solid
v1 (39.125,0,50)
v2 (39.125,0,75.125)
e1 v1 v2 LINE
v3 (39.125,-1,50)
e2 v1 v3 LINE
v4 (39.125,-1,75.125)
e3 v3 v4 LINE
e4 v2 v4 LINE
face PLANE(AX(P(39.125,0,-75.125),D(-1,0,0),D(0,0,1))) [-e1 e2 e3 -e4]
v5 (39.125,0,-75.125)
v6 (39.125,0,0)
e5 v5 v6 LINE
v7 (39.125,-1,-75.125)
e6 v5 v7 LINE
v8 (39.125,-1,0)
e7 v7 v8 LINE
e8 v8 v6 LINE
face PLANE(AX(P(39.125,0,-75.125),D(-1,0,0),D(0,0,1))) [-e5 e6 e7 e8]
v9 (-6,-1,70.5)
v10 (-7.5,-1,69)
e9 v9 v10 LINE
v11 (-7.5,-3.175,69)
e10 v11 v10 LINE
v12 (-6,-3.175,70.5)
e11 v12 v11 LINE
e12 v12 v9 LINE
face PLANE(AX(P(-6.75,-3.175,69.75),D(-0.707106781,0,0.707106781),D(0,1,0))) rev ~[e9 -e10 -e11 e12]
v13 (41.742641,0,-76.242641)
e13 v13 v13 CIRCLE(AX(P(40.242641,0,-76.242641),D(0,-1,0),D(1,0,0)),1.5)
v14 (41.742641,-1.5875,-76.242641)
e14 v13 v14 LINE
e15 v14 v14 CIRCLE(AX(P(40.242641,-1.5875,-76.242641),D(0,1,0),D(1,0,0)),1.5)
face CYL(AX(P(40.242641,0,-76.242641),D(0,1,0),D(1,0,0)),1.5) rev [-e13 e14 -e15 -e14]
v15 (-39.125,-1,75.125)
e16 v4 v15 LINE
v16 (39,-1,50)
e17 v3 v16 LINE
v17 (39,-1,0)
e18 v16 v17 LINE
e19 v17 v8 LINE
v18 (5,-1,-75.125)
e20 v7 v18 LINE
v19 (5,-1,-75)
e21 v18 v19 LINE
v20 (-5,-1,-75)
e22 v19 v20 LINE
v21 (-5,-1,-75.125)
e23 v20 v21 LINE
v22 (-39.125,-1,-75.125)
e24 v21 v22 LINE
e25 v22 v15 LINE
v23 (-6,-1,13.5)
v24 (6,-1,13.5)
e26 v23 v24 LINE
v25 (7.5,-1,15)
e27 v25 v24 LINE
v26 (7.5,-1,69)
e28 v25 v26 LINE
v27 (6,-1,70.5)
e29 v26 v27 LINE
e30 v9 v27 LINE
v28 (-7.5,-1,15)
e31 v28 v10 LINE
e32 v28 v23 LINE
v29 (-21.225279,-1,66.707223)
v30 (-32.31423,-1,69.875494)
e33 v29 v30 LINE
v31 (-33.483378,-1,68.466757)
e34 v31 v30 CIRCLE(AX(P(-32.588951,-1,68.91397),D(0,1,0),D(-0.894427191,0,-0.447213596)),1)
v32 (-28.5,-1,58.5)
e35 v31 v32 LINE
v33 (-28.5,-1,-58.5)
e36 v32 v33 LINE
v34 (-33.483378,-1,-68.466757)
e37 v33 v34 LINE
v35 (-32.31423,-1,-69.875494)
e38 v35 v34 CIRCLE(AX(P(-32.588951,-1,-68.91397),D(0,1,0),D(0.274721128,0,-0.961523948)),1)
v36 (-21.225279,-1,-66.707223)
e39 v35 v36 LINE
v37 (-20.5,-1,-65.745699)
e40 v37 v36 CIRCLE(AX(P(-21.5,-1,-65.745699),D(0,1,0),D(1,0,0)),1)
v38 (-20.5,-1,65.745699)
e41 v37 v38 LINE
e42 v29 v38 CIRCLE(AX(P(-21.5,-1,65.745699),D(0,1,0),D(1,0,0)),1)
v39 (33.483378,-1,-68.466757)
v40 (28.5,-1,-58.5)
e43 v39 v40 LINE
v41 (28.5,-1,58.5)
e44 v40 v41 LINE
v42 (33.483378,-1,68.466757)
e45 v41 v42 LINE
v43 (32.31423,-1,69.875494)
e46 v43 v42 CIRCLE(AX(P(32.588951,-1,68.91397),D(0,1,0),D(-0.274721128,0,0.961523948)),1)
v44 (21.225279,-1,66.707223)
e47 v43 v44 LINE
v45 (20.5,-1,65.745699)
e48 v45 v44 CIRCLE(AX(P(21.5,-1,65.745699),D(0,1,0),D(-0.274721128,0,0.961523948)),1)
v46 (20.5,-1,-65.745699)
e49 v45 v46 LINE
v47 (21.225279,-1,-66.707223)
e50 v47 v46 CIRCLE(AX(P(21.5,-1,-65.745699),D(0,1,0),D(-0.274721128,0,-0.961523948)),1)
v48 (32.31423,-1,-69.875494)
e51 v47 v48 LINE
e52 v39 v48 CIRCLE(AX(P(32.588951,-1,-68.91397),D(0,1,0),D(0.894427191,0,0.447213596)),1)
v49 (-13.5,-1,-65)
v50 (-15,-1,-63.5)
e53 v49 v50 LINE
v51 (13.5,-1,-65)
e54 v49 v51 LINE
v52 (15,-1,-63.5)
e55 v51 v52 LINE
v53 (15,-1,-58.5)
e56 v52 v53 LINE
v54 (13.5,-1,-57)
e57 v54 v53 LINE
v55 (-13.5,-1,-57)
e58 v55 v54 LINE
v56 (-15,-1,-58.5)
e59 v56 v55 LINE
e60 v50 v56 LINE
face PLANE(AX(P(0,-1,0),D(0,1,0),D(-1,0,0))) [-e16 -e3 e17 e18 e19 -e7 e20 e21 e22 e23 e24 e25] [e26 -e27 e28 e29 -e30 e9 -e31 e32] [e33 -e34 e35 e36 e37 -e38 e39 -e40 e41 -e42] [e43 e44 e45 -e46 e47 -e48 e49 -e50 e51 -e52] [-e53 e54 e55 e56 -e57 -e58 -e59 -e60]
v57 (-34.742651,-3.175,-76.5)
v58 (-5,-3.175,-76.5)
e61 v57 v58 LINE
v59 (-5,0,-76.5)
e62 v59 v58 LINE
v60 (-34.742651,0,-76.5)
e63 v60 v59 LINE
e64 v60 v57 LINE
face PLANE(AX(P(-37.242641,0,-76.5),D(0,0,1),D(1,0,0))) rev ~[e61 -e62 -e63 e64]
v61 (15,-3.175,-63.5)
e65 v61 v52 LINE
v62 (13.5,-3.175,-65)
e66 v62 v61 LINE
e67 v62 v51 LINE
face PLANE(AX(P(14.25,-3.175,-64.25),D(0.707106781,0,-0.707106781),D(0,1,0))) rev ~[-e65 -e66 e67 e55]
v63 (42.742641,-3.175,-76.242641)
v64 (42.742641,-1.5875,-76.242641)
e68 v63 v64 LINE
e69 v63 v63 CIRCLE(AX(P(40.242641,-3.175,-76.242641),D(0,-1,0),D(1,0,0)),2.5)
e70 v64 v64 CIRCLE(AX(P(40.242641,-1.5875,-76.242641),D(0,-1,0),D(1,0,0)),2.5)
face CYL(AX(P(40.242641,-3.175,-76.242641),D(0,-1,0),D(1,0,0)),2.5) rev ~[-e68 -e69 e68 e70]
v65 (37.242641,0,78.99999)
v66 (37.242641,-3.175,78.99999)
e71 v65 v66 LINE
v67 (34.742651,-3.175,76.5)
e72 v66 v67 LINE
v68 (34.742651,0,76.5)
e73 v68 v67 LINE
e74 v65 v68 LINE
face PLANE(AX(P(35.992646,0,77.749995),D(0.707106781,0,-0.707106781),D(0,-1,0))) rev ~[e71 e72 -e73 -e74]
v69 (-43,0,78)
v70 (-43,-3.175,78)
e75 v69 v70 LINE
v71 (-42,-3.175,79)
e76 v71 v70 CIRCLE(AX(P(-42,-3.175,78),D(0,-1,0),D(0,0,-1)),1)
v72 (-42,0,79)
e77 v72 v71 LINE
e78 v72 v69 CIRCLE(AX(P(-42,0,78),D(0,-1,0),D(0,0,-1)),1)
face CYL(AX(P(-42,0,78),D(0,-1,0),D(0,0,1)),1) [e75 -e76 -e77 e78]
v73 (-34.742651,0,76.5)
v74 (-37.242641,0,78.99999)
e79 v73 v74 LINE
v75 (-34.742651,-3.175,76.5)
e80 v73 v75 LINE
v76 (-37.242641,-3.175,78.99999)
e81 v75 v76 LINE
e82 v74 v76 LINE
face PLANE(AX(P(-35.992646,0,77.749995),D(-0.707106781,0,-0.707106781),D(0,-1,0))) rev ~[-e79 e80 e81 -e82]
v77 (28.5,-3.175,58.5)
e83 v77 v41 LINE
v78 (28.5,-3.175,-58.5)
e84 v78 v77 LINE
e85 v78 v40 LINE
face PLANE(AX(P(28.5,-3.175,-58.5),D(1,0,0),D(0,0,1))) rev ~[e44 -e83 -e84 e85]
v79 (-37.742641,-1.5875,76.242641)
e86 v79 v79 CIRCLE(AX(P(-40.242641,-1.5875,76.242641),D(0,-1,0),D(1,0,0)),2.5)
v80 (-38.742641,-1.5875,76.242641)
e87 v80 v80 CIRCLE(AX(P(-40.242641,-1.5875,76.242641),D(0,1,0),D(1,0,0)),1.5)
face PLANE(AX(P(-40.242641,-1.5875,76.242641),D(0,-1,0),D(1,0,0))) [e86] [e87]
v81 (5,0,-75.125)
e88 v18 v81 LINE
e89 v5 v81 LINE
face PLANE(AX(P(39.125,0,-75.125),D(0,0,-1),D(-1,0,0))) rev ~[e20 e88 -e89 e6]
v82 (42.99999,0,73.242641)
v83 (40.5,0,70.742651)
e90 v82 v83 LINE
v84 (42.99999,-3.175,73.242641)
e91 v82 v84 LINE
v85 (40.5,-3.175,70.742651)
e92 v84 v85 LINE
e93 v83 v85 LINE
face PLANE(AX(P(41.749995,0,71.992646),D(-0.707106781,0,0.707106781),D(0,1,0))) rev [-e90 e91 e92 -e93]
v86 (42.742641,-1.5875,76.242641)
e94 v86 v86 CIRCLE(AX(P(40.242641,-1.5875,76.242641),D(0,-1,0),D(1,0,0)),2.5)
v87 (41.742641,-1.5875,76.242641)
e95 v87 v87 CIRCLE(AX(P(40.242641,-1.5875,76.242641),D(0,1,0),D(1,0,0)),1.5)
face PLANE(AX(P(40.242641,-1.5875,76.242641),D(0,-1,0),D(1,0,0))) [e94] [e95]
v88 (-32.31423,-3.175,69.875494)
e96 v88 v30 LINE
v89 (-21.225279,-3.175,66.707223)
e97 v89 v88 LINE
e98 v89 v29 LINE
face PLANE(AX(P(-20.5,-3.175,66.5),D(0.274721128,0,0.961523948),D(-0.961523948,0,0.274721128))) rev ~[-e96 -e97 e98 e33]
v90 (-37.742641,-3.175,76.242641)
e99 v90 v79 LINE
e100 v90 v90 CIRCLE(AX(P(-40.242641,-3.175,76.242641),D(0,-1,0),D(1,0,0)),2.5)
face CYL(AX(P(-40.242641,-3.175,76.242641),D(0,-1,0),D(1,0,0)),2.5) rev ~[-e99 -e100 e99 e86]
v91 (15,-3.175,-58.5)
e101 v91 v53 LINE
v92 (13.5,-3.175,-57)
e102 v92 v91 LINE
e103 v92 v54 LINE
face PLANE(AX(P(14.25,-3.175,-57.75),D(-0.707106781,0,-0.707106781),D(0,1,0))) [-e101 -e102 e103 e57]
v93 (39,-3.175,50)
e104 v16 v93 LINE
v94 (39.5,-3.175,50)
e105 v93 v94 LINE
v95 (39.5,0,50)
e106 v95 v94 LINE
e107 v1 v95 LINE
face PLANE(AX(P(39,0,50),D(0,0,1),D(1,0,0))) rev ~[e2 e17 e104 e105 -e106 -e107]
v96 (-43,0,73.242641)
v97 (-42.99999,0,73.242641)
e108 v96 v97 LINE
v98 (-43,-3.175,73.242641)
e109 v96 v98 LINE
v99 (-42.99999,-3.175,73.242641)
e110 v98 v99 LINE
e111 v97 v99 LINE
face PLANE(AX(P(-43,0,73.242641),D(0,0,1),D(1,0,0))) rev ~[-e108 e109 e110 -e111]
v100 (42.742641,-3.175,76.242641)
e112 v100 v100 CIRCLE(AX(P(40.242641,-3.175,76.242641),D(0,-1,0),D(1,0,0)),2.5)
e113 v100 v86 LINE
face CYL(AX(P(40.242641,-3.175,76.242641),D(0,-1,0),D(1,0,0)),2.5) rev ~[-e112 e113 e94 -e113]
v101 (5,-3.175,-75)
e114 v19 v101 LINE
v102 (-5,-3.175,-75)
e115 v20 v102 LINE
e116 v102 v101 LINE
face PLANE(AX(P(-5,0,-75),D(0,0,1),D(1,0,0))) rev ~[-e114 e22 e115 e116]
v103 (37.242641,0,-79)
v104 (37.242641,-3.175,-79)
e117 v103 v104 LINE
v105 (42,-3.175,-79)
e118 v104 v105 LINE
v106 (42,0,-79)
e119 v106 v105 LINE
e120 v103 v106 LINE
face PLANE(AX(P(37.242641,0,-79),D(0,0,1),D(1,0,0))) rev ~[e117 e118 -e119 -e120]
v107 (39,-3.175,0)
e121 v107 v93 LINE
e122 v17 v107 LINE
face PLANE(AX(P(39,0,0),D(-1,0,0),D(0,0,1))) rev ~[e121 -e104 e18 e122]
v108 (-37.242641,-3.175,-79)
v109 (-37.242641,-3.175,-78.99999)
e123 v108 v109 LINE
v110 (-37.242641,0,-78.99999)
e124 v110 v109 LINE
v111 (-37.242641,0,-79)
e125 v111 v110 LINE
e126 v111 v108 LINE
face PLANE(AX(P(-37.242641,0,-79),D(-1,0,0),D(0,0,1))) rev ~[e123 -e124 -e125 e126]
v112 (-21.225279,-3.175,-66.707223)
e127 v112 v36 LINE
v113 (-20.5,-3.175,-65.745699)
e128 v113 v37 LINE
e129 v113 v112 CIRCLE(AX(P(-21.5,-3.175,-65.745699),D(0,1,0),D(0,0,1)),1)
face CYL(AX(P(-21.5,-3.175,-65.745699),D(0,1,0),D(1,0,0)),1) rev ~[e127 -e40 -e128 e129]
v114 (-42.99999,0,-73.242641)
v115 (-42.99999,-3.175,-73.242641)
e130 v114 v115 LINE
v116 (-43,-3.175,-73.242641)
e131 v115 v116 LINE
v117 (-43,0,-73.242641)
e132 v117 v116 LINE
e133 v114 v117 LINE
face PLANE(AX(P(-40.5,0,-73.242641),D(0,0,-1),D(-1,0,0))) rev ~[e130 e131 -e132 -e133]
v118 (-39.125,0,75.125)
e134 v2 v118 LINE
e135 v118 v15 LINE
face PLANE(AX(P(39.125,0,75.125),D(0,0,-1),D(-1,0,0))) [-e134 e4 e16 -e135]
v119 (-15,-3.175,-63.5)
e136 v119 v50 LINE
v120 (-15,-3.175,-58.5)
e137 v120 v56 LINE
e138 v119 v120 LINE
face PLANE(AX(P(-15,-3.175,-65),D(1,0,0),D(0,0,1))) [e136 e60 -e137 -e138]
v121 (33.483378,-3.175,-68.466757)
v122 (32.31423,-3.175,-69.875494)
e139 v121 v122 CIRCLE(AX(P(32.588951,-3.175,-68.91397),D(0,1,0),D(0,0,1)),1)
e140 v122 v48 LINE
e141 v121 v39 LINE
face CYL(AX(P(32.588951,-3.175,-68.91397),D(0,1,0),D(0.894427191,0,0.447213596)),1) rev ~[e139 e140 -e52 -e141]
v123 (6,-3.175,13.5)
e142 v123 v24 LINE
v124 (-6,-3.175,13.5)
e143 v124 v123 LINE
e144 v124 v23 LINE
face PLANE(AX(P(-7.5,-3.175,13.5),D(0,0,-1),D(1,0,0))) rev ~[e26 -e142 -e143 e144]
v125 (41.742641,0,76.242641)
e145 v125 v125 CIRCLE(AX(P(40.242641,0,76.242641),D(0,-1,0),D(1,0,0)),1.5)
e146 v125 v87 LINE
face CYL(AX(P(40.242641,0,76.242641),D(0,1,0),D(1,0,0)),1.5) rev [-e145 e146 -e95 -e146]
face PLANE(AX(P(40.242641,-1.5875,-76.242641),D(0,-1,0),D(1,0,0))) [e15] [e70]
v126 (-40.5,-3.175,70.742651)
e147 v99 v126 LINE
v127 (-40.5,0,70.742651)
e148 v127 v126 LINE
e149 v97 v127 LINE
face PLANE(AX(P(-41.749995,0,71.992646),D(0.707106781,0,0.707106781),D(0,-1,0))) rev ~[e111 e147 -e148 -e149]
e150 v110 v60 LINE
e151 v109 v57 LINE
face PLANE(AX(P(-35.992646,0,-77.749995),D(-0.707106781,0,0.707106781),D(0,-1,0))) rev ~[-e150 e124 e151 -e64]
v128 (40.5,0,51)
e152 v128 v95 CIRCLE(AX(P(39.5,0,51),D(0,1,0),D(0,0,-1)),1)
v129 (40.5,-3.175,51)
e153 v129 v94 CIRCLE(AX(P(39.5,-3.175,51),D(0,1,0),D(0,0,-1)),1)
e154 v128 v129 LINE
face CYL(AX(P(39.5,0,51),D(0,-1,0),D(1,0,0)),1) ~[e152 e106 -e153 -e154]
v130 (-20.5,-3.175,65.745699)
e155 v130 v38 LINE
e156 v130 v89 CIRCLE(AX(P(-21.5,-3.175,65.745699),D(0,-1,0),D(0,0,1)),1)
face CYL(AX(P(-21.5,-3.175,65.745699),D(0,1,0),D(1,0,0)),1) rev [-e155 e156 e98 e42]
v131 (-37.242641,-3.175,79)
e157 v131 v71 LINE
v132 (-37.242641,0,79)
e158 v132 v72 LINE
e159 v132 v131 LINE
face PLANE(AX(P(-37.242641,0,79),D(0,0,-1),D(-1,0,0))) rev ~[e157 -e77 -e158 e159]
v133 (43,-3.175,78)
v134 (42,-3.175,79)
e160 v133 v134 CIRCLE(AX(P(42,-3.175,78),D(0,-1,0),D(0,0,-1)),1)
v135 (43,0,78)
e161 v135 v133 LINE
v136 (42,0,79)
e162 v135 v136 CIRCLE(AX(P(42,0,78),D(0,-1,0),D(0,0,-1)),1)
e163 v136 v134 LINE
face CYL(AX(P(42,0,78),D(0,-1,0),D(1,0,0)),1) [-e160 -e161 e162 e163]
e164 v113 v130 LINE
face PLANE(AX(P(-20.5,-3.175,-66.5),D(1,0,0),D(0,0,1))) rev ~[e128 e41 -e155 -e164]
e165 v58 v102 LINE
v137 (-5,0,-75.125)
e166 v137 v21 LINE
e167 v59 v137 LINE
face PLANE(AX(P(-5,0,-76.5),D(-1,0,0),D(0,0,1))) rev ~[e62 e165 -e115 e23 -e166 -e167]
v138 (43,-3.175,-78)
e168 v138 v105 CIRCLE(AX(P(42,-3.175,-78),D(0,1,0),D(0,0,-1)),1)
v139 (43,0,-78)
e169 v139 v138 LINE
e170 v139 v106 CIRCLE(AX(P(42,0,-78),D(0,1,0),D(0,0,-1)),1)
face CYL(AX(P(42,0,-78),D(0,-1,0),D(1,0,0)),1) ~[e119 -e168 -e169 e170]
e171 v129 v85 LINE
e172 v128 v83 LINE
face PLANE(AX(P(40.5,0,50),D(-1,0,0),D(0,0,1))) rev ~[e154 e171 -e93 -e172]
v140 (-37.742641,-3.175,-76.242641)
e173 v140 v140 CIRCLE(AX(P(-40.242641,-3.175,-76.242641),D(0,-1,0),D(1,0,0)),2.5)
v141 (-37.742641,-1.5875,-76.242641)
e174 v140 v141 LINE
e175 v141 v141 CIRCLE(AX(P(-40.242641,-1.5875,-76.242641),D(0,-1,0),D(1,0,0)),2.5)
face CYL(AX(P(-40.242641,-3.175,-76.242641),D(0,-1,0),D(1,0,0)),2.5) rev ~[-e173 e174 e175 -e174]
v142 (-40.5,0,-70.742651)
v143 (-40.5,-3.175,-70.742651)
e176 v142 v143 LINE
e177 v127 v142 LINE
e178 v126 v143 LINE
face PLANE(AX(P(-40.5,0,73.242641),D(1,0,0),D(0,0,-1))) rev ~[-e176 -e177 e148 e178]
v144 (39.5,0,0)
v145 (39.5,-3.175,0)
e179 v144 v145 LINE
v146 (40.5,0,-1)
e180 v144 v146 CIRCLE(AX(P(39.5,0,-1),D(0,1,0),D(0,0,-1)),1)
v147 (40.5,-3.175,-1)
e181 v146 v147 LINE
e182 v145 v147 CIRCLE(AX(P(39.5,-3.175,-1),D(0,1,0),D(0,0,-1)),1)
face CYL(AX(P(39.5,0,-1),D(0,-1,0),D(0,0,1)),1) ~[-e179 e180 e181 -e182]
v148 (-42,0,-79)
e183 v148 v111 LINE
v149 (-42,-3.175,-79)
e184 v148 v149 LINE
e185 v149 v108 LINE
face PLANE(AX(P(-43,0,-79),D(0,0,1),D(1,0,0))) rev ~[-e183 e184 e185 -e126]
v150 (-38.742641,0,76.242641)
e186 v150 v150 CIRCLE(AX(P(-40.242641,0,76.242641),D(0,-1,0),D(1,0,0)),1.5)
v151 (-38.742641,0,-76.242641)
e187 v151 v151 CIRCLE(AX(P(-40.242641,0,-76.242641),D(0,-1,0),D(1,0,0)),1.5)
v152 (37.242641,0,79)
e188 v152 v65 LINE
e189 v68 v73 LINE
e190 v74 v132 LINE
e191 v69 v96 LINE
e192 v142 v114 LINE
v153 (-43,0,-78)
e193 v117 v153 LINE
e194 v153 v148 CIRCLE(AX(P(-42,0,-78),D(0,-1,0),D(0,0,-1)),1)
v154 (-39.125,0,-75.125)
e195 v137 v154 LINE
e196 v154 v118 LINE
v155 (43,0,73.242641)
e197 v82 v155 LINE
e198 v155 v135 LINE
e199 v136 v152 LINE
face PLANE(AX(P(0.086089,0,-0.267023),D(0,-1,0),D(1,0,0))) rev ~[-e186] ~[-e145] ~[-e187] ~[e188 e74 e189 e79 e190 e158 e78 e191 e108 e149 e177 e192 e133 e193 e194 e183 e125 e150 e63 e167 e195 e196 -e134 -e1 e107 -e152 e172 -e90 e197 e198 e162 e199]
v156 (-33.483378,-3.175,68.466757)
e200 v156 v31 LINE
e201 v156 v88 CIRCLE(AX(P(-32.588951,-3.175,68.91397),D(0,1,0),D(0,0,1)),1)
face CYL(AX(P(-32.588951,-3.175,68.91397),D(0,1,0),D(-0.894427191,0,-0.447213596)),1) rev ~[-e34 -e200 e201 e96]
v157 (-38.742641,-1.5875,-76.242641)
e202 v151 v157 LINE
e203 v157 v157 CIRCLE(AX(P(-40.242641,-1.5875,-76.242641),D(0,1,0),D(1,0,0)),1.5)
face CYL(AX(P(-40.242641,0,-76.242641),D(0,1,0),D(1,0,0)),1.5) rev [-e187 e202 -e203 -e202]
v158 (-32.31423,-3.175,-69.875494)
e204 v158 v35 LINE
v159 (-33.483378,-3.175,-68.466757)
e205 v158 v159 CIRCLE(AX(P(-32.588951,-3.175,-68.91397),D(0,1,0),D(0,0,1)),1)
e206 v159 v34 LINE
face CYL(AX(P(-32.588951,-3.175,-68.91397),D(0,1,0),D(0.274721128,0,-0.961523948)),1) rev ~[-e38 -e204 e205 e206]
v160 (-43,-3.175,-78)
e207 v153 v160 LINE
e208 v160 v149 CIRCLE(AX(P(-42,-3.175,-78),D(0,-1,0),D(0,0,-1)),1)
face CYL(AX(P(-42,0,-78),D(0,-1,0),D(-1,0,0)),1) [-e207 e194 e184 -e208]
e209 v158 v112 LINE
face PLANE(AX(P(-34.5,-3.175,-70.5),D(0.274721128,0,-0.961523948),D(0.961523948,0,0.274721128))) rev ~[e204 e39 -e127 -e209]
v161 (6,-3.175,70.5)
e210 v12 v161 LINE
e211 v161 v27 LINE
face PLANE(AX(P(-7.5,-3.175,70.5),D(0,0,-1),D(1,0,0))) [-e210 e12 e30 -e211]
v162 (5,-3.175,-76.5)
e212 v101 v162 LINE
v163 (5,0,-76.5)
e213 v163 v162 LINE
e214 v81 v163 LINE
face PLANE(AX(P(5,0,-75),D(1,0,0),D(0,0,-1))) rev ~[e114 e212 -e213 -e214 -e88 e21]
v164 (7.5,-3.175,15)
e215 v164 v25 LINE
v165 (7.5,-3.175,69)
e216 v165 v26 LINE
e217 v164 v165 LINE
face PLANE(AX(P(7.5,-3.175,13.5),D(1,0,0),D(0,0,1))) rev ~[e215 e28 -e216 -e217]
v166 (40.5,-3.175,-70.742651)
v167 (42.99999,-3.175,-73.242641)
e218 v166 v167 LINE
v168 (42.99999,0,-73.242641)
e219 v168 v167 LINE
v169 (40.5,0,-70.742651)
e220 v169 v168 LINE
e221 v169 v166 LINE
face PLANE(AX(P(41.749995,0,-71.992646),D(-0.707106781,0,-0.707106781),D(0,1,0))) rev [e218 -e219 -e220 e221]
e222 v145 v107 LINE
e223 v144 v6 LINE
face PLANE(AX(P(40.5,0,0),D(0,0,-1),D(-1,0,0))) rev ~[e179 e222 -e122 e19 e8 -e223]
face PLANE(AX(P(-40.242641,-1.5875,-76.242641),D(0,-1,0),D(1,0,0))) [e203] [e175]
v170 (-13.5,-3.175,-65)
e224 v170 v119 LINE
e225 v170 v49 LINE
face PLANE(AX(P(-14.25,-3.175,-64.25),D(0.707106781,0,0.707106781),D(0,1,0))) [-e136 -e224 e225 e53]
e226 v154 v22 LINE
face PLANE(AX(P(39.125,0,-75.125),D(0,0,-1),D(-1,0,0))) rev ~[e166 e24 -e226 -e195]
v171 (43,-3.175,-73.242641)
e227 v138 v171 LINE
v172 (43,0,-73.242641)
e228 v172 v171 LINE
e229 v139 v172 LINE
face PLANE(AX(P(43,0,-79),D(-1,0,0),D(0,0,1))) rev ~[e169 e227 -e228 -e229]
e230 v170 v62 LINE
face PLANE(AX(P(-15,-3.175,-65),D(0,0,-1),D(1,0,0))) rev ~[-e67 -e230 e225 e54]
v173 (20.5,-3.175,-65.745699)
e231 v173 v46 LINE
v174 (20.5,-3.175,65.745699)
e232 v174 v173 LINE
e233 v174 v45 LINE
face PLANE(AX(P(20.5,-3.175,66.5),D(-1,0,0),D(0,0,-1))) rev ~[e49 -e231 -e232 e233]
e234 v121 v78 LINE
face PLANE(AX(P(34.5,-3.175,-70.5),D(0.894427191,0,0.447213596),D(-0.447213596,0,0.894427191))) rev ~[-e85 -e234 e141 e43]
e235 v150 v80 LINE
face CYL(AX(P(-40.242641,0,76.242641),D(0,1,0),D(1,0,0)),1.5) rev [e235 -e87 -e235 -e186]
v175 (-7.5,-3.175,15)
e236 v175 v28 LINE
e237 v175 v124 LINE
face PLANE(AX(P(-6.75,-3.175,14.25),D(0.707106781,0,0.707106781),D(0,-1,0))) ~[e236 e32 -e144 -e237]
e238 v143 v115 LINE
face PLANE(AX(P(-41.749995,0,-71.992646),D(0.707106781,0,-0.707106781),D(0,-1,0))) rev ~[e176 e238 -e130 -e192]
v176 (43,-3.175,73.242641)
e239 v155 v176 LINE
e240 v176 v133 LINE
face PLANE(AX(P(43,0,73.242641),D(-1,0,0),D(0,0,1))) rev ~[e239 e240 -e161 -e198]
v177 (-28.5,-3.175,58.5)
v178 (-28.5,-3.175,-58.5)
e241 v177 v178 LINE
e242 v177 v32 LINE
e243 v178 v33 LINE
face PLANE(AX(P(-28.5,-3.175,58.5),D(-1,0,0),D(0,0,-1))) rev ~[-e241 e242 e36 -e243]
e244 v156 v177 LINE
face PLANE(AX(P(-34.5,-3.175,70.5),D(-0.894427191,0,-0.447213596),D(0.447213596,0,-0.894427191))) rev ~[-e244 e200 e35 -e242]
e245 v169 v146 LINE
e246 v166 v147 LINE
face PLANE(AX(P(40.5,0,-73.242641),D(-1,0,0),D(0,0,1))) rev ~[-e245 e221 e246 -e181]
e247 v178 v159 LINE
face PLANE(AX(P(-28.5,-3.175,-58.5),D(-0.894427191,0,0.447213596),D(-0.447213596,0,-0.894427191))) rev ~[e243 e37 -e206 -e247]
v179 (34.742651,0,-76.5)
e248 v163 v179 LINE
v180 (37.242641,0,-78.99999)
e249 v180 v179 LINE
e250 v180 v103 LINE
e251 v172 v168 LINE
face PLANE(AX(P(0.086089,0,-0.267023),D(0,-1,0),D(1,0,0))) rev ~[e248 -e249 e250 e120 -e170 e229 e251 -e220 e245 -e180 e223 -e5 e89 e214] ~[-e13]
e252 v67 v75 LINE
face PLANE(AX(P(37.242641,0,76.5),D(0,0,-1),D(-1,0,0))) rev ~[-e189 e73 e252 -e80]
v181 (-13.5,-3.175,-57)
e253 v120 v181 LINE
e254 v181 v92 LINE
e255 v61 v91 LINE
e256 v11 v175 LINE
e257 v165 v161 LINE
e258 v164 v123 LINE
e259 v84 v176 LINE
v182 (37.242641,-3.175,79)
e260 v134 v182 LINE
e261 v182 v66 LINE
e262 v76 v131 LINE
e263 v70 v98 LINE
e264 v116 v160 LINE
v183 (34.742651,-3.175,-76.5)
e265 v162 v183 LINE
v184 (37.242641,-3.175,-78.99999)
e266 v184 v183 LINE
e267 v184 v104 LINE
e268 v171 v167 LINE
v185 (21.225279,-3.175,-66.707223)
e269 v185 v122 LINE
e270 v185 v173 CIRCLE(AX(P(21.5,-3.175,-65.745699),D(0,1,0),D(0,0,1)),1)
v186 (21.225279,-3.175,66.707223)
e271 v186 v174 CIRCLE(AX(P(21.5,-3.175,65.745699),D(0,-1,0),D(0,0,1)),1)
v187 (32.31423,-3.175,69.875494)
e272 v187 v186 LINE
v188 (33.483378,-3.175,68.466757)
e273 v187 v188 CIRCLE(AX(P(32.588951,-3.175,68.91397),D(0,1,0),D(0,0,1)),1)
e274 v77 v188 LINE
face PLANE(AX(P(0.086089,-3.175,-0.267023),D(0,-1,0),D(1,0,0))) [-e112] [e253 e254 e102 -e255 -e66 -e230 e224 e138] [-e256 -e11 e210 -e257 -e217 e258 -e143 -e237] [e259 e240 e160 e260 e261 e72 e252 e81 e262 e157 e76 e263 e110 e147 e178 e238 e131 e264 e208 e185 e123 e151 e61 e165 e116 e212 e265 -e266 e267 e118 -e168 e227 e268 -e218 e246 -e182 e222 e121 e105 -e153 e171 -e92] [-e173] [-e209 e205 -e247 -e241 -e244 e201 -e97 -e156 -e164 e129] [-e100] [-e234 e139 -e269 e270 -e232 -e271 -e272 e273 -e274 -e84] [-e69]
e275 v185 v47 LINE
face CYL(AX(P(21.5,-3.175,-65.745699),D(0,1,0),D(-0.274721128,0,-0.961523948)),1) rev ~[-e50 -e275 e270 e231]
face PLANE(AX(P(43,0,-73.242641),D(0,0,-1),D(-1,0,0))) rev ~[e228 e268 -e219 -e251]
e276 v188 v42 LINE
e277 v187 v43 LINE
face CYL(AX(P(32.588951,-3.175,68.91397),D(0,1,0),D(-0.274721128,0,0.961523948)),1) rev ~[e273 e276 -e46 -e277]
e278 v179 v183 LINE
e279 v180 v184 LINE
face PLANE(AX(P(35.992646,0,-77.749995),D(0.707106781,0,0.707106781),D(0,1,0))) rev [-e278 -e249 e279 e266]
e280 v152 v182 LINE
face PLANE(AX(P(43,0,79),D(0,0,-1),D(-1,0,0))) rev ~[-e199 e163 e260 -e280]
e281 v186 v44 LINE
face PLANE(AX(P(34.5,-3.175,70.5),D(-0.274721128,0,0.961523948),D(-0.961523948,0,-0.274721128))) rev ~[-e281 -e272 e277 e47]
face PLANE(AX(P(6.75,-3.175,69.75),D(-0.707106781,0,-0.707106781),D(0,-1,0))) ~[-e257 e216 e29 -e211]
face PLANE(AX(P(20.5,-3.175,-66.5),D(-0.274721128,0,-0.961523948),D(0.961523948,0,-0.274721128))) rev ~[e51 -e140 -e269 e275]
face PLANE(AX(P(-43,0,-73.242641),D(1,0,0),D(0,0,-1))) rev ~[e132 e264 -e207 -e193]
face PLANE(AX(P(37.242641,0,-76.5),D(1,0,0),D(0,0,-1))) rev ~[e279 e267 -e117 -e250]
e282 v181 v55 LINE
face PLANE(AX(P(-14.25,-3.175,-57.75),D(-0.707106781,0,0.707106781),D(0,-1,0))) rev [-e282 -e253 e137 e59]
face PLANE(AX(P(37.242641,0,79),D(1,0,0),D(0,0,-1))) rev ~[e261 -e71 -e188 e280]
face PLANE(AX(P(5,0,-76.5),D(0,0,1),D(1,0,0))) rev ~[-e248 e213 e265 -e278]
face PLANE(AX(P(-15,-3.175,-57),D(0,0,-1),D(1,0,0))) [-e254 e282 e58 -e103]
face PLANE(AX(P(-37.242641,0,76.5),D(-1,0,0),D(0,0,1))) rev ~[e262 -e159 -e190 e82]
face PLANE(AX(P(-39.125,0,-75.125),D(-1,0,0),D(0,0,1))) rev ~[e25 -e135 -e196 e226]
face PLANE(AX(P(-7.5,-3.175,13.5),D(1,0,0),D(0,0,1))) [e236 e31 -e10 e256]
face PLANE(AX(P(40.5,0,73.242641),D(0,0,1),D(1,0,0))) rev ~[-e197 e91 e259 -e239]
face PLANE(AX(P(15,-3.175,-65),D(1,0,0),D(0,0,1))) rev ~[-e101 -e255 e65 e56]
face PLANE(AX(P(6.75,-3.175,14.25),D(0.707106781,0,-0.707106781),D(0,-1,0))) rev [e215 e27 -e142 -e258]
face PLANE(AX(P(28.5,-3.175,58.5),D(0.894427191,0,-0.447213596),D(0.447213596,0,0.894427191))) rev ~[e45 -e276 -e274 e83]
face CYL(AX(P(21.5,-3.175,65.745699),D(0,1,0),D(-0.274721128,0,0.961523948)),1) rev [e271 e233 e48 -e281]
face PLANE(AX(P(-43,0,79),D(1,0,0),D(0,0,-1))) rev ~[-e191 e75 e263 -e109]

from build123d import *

# Parameters (mm, degrees)
F1_R      = 1.5
F1_W      = 24
F1_H      = 4
F2_DEPTH  = 3.175
F3_SIZE   = 2.49999
F4_R      = 1
F5_R      = 2.5
F6_DEPTH  = 1.5875
F7_W      = 15
F7_H      = 57
F7_W_2    = 30
F7_H_2    = 8
F8_DEPTH  = 3.176
F9_SIZE   = 1.5
F10_SIZE  = 1.5
F11_R     = 1
F12_W     = 78.25
F12_H     = 150.25
F13_DEPTH = 1


# Not quite as in the source:
# - a fillet or chamfer is up to 0.001 mm smaller than in the source, because OpenCascade refuses the exact size


with BuildPart() as f2:
    # F1 (on Front) → F2 (new body)
    with BuildSketch(Plane.XZ):
        Polygon((43, 73.2426406871), (43, 79), (37.2426406871, 79), (37.2426406871, 76.5), (-37.2426406871, 76.5), (-37.2426406871, 79), (-43, 79), (-43, 73.2426406871), (-40.5, 73.2426406871), (-40.5, -73.2426406871), (-43, -73.2426406871), (-43, -79), (-37.2426406871, -79), (-37.2426406871, -76.5), (-5, -76.5), (-5, -75), (5, -75), (5, -76.5), (37.2426406871, -76.5), (37.2426406871, -79), (43, -79), (43, -73.2426406871), (40.5, -73.2426406871), (40.5, 0), (39, 0), (39, 50), (40.5, 50), (40.5, 73.2426406871), align=None)
        with Locations((-40.2426406871, -76.2426406871)):
            Circle(F1_R, mode=Mode.SUBTRACT)
        with Locations((0, -61)):
            Rectangle(F1_W, F1_H, mode=Mode.SUBTRACT)
        with Locations((40.2426406871, -76.2426406871)):
            Circle(F1_R, mode=Mode.SUBTRACT)
        with Locations((-40.2426406871, 76.2426406871)):
            Circle(F1_R, mode=Mode.SUBTRACT)
        with BuildLine():
            ThreePointArc((-7.5, 58.5), (0, 66), (7.5, 58.5))
            Line((7.5, 58.5), (7.5, 25.5))
            ThreePointArc((7.5, 25.5), (0, 18), (-7.5, 25.5))
            Line((-7.5, 25.5), (-7.5, 58.5))
        make_face(mode=Mode.SUBTRACT)
        with Locations((40.2426406871, 76.2426406871)):
            Circle(F1_R, mode=Mode.SUBTRACT)
    extrude(amount=F2_DEPTH)

    # F3 (size 2.5 in the source; OpenCascade refuses exactly that, so slightly less here)
    f3_edges = [f2.edges().sort_by_distance(p)[0] for p in [
        (-37.242641, -1.5875, 76.5),
        (-40.5, -1.5875, 73.242641),
        (37.242641, -1.5875, 76.5),
        (40.5, -1.5875, 73.242641),
        (40.5, -1.5875, -73.242641),
        (37.242641, -1.5875, -76.5),
        (-37.242641, -1.5875, -76.5),
        (-40.5, -1.5875, -73.242641),
    ]]
    chamfer(f3_edges, length=F3_SIZE)

    # F4
    f4_edges = [f2.edges().sort_by_distance(p)[0] for p in [
        (43, -1.5875, 79),
        (-43, -1.5875, 79),
        (43, -1.5875, -79),
        (-43, -1.5875, -79),
        (40.5, -1.5875, 50),
        (40.5, -1.5875, 0),
    ]]
    fillet(f4_edges, radius=F4_R)

    # F5 (on face) → F6 (cut)
    with BuildSketch(Plane.XZ.offset(3.175)):
        with Locations((-40.2426406871, 76.2426406871)):
            Circle(F5_R)
        with Locations((40.2426406871, 76.2426406871)):
            Circle(F5_R)
        with Locations((40.2426406871, -76.2426406871)):
            Circle(F5_R)
        with Locations((-40.2426406871, -76.2426406871)):
            Circle(F5_R)
    extrude(amount=-F6_DEPTH, mode=Mode.SUBTRACT)

    # F7 (on face) → F8 (cut, through all)
    with BuildSketch(Plane.XZ.offset(3.175)):
        Polygon((-20.5, -66.5), (-20.5, 66.5), (-34.5, 70.5), (-28.5, 58.5), (-28.5, -58.5), (-34.5, -70.5), align=None)
        Polygon((34.5, 70.5), (20.5, 66.5), (20.5, -66.5), (34.5, -70.5), (28.5, -58.5), (28.5, 58.5), align=None)
        with Locations((0, 42)):
            Rectangle(F7_W, F7_H)
        with Locations((0, -61)):
            Rectangle(F7_W_2, F7_H_2)
    extrude(amount=-F8_DEPTH, mode=Mode.SUBTRACT)

    # F9
    f9_edges = [f2.edges().sort_by_distance(p)[0] for p in [
        (7.5, -1.5875, 70.5),
        (-7.5, -1.5875, 70.5),
        (-7.5, -1.5875, 13.5),
        (7.5, -1.5875, 13.5),
    ]]
    chamfer(f9_edges, length=F9_SIZE)

    # F10
    f10_edges = [f2.edges().sort_by_distance(p)[0] for p in [
        (-15, -1.5875, -65),
        (-15, -1.5875, -57),
        (15, -1.5875, -57),
        (15, -1.5875, -65),
    ]]
    chamfer(f10_edges, length=F10_SIZE)

    # F11
    f11_edges = [f2.edges().sort_by_distance(p)[0] for p in [
        (-34.5, -1.5875, 70.5),
        (-20.5, -1.5875, 66.5),
        (20.5, -1.5875, 66.5),
        (34.5, -1.5875, 70.5),
        (34.5, -1.5875, -70.5),
        (20.5, -1.5875, -66.5),
        (-34.5, -1.5875, -70.5),
        (-20.5, -1.5875, -66.5),
    ]]
    fillet(f11_edges, radius=F11_R)

    # F12 (on face) → F13 (cut)
    with BuildSketch(Plane(origin=(0, 0, 0), x_dir=(-1, 0, 0), z_dir=(0, 1, 0))):
        Rectangle(F12_W, F12_H)
    extrude(amount=-F13_DEPTH, mode=Mode.SUBTRACT)


solid = f2.part
